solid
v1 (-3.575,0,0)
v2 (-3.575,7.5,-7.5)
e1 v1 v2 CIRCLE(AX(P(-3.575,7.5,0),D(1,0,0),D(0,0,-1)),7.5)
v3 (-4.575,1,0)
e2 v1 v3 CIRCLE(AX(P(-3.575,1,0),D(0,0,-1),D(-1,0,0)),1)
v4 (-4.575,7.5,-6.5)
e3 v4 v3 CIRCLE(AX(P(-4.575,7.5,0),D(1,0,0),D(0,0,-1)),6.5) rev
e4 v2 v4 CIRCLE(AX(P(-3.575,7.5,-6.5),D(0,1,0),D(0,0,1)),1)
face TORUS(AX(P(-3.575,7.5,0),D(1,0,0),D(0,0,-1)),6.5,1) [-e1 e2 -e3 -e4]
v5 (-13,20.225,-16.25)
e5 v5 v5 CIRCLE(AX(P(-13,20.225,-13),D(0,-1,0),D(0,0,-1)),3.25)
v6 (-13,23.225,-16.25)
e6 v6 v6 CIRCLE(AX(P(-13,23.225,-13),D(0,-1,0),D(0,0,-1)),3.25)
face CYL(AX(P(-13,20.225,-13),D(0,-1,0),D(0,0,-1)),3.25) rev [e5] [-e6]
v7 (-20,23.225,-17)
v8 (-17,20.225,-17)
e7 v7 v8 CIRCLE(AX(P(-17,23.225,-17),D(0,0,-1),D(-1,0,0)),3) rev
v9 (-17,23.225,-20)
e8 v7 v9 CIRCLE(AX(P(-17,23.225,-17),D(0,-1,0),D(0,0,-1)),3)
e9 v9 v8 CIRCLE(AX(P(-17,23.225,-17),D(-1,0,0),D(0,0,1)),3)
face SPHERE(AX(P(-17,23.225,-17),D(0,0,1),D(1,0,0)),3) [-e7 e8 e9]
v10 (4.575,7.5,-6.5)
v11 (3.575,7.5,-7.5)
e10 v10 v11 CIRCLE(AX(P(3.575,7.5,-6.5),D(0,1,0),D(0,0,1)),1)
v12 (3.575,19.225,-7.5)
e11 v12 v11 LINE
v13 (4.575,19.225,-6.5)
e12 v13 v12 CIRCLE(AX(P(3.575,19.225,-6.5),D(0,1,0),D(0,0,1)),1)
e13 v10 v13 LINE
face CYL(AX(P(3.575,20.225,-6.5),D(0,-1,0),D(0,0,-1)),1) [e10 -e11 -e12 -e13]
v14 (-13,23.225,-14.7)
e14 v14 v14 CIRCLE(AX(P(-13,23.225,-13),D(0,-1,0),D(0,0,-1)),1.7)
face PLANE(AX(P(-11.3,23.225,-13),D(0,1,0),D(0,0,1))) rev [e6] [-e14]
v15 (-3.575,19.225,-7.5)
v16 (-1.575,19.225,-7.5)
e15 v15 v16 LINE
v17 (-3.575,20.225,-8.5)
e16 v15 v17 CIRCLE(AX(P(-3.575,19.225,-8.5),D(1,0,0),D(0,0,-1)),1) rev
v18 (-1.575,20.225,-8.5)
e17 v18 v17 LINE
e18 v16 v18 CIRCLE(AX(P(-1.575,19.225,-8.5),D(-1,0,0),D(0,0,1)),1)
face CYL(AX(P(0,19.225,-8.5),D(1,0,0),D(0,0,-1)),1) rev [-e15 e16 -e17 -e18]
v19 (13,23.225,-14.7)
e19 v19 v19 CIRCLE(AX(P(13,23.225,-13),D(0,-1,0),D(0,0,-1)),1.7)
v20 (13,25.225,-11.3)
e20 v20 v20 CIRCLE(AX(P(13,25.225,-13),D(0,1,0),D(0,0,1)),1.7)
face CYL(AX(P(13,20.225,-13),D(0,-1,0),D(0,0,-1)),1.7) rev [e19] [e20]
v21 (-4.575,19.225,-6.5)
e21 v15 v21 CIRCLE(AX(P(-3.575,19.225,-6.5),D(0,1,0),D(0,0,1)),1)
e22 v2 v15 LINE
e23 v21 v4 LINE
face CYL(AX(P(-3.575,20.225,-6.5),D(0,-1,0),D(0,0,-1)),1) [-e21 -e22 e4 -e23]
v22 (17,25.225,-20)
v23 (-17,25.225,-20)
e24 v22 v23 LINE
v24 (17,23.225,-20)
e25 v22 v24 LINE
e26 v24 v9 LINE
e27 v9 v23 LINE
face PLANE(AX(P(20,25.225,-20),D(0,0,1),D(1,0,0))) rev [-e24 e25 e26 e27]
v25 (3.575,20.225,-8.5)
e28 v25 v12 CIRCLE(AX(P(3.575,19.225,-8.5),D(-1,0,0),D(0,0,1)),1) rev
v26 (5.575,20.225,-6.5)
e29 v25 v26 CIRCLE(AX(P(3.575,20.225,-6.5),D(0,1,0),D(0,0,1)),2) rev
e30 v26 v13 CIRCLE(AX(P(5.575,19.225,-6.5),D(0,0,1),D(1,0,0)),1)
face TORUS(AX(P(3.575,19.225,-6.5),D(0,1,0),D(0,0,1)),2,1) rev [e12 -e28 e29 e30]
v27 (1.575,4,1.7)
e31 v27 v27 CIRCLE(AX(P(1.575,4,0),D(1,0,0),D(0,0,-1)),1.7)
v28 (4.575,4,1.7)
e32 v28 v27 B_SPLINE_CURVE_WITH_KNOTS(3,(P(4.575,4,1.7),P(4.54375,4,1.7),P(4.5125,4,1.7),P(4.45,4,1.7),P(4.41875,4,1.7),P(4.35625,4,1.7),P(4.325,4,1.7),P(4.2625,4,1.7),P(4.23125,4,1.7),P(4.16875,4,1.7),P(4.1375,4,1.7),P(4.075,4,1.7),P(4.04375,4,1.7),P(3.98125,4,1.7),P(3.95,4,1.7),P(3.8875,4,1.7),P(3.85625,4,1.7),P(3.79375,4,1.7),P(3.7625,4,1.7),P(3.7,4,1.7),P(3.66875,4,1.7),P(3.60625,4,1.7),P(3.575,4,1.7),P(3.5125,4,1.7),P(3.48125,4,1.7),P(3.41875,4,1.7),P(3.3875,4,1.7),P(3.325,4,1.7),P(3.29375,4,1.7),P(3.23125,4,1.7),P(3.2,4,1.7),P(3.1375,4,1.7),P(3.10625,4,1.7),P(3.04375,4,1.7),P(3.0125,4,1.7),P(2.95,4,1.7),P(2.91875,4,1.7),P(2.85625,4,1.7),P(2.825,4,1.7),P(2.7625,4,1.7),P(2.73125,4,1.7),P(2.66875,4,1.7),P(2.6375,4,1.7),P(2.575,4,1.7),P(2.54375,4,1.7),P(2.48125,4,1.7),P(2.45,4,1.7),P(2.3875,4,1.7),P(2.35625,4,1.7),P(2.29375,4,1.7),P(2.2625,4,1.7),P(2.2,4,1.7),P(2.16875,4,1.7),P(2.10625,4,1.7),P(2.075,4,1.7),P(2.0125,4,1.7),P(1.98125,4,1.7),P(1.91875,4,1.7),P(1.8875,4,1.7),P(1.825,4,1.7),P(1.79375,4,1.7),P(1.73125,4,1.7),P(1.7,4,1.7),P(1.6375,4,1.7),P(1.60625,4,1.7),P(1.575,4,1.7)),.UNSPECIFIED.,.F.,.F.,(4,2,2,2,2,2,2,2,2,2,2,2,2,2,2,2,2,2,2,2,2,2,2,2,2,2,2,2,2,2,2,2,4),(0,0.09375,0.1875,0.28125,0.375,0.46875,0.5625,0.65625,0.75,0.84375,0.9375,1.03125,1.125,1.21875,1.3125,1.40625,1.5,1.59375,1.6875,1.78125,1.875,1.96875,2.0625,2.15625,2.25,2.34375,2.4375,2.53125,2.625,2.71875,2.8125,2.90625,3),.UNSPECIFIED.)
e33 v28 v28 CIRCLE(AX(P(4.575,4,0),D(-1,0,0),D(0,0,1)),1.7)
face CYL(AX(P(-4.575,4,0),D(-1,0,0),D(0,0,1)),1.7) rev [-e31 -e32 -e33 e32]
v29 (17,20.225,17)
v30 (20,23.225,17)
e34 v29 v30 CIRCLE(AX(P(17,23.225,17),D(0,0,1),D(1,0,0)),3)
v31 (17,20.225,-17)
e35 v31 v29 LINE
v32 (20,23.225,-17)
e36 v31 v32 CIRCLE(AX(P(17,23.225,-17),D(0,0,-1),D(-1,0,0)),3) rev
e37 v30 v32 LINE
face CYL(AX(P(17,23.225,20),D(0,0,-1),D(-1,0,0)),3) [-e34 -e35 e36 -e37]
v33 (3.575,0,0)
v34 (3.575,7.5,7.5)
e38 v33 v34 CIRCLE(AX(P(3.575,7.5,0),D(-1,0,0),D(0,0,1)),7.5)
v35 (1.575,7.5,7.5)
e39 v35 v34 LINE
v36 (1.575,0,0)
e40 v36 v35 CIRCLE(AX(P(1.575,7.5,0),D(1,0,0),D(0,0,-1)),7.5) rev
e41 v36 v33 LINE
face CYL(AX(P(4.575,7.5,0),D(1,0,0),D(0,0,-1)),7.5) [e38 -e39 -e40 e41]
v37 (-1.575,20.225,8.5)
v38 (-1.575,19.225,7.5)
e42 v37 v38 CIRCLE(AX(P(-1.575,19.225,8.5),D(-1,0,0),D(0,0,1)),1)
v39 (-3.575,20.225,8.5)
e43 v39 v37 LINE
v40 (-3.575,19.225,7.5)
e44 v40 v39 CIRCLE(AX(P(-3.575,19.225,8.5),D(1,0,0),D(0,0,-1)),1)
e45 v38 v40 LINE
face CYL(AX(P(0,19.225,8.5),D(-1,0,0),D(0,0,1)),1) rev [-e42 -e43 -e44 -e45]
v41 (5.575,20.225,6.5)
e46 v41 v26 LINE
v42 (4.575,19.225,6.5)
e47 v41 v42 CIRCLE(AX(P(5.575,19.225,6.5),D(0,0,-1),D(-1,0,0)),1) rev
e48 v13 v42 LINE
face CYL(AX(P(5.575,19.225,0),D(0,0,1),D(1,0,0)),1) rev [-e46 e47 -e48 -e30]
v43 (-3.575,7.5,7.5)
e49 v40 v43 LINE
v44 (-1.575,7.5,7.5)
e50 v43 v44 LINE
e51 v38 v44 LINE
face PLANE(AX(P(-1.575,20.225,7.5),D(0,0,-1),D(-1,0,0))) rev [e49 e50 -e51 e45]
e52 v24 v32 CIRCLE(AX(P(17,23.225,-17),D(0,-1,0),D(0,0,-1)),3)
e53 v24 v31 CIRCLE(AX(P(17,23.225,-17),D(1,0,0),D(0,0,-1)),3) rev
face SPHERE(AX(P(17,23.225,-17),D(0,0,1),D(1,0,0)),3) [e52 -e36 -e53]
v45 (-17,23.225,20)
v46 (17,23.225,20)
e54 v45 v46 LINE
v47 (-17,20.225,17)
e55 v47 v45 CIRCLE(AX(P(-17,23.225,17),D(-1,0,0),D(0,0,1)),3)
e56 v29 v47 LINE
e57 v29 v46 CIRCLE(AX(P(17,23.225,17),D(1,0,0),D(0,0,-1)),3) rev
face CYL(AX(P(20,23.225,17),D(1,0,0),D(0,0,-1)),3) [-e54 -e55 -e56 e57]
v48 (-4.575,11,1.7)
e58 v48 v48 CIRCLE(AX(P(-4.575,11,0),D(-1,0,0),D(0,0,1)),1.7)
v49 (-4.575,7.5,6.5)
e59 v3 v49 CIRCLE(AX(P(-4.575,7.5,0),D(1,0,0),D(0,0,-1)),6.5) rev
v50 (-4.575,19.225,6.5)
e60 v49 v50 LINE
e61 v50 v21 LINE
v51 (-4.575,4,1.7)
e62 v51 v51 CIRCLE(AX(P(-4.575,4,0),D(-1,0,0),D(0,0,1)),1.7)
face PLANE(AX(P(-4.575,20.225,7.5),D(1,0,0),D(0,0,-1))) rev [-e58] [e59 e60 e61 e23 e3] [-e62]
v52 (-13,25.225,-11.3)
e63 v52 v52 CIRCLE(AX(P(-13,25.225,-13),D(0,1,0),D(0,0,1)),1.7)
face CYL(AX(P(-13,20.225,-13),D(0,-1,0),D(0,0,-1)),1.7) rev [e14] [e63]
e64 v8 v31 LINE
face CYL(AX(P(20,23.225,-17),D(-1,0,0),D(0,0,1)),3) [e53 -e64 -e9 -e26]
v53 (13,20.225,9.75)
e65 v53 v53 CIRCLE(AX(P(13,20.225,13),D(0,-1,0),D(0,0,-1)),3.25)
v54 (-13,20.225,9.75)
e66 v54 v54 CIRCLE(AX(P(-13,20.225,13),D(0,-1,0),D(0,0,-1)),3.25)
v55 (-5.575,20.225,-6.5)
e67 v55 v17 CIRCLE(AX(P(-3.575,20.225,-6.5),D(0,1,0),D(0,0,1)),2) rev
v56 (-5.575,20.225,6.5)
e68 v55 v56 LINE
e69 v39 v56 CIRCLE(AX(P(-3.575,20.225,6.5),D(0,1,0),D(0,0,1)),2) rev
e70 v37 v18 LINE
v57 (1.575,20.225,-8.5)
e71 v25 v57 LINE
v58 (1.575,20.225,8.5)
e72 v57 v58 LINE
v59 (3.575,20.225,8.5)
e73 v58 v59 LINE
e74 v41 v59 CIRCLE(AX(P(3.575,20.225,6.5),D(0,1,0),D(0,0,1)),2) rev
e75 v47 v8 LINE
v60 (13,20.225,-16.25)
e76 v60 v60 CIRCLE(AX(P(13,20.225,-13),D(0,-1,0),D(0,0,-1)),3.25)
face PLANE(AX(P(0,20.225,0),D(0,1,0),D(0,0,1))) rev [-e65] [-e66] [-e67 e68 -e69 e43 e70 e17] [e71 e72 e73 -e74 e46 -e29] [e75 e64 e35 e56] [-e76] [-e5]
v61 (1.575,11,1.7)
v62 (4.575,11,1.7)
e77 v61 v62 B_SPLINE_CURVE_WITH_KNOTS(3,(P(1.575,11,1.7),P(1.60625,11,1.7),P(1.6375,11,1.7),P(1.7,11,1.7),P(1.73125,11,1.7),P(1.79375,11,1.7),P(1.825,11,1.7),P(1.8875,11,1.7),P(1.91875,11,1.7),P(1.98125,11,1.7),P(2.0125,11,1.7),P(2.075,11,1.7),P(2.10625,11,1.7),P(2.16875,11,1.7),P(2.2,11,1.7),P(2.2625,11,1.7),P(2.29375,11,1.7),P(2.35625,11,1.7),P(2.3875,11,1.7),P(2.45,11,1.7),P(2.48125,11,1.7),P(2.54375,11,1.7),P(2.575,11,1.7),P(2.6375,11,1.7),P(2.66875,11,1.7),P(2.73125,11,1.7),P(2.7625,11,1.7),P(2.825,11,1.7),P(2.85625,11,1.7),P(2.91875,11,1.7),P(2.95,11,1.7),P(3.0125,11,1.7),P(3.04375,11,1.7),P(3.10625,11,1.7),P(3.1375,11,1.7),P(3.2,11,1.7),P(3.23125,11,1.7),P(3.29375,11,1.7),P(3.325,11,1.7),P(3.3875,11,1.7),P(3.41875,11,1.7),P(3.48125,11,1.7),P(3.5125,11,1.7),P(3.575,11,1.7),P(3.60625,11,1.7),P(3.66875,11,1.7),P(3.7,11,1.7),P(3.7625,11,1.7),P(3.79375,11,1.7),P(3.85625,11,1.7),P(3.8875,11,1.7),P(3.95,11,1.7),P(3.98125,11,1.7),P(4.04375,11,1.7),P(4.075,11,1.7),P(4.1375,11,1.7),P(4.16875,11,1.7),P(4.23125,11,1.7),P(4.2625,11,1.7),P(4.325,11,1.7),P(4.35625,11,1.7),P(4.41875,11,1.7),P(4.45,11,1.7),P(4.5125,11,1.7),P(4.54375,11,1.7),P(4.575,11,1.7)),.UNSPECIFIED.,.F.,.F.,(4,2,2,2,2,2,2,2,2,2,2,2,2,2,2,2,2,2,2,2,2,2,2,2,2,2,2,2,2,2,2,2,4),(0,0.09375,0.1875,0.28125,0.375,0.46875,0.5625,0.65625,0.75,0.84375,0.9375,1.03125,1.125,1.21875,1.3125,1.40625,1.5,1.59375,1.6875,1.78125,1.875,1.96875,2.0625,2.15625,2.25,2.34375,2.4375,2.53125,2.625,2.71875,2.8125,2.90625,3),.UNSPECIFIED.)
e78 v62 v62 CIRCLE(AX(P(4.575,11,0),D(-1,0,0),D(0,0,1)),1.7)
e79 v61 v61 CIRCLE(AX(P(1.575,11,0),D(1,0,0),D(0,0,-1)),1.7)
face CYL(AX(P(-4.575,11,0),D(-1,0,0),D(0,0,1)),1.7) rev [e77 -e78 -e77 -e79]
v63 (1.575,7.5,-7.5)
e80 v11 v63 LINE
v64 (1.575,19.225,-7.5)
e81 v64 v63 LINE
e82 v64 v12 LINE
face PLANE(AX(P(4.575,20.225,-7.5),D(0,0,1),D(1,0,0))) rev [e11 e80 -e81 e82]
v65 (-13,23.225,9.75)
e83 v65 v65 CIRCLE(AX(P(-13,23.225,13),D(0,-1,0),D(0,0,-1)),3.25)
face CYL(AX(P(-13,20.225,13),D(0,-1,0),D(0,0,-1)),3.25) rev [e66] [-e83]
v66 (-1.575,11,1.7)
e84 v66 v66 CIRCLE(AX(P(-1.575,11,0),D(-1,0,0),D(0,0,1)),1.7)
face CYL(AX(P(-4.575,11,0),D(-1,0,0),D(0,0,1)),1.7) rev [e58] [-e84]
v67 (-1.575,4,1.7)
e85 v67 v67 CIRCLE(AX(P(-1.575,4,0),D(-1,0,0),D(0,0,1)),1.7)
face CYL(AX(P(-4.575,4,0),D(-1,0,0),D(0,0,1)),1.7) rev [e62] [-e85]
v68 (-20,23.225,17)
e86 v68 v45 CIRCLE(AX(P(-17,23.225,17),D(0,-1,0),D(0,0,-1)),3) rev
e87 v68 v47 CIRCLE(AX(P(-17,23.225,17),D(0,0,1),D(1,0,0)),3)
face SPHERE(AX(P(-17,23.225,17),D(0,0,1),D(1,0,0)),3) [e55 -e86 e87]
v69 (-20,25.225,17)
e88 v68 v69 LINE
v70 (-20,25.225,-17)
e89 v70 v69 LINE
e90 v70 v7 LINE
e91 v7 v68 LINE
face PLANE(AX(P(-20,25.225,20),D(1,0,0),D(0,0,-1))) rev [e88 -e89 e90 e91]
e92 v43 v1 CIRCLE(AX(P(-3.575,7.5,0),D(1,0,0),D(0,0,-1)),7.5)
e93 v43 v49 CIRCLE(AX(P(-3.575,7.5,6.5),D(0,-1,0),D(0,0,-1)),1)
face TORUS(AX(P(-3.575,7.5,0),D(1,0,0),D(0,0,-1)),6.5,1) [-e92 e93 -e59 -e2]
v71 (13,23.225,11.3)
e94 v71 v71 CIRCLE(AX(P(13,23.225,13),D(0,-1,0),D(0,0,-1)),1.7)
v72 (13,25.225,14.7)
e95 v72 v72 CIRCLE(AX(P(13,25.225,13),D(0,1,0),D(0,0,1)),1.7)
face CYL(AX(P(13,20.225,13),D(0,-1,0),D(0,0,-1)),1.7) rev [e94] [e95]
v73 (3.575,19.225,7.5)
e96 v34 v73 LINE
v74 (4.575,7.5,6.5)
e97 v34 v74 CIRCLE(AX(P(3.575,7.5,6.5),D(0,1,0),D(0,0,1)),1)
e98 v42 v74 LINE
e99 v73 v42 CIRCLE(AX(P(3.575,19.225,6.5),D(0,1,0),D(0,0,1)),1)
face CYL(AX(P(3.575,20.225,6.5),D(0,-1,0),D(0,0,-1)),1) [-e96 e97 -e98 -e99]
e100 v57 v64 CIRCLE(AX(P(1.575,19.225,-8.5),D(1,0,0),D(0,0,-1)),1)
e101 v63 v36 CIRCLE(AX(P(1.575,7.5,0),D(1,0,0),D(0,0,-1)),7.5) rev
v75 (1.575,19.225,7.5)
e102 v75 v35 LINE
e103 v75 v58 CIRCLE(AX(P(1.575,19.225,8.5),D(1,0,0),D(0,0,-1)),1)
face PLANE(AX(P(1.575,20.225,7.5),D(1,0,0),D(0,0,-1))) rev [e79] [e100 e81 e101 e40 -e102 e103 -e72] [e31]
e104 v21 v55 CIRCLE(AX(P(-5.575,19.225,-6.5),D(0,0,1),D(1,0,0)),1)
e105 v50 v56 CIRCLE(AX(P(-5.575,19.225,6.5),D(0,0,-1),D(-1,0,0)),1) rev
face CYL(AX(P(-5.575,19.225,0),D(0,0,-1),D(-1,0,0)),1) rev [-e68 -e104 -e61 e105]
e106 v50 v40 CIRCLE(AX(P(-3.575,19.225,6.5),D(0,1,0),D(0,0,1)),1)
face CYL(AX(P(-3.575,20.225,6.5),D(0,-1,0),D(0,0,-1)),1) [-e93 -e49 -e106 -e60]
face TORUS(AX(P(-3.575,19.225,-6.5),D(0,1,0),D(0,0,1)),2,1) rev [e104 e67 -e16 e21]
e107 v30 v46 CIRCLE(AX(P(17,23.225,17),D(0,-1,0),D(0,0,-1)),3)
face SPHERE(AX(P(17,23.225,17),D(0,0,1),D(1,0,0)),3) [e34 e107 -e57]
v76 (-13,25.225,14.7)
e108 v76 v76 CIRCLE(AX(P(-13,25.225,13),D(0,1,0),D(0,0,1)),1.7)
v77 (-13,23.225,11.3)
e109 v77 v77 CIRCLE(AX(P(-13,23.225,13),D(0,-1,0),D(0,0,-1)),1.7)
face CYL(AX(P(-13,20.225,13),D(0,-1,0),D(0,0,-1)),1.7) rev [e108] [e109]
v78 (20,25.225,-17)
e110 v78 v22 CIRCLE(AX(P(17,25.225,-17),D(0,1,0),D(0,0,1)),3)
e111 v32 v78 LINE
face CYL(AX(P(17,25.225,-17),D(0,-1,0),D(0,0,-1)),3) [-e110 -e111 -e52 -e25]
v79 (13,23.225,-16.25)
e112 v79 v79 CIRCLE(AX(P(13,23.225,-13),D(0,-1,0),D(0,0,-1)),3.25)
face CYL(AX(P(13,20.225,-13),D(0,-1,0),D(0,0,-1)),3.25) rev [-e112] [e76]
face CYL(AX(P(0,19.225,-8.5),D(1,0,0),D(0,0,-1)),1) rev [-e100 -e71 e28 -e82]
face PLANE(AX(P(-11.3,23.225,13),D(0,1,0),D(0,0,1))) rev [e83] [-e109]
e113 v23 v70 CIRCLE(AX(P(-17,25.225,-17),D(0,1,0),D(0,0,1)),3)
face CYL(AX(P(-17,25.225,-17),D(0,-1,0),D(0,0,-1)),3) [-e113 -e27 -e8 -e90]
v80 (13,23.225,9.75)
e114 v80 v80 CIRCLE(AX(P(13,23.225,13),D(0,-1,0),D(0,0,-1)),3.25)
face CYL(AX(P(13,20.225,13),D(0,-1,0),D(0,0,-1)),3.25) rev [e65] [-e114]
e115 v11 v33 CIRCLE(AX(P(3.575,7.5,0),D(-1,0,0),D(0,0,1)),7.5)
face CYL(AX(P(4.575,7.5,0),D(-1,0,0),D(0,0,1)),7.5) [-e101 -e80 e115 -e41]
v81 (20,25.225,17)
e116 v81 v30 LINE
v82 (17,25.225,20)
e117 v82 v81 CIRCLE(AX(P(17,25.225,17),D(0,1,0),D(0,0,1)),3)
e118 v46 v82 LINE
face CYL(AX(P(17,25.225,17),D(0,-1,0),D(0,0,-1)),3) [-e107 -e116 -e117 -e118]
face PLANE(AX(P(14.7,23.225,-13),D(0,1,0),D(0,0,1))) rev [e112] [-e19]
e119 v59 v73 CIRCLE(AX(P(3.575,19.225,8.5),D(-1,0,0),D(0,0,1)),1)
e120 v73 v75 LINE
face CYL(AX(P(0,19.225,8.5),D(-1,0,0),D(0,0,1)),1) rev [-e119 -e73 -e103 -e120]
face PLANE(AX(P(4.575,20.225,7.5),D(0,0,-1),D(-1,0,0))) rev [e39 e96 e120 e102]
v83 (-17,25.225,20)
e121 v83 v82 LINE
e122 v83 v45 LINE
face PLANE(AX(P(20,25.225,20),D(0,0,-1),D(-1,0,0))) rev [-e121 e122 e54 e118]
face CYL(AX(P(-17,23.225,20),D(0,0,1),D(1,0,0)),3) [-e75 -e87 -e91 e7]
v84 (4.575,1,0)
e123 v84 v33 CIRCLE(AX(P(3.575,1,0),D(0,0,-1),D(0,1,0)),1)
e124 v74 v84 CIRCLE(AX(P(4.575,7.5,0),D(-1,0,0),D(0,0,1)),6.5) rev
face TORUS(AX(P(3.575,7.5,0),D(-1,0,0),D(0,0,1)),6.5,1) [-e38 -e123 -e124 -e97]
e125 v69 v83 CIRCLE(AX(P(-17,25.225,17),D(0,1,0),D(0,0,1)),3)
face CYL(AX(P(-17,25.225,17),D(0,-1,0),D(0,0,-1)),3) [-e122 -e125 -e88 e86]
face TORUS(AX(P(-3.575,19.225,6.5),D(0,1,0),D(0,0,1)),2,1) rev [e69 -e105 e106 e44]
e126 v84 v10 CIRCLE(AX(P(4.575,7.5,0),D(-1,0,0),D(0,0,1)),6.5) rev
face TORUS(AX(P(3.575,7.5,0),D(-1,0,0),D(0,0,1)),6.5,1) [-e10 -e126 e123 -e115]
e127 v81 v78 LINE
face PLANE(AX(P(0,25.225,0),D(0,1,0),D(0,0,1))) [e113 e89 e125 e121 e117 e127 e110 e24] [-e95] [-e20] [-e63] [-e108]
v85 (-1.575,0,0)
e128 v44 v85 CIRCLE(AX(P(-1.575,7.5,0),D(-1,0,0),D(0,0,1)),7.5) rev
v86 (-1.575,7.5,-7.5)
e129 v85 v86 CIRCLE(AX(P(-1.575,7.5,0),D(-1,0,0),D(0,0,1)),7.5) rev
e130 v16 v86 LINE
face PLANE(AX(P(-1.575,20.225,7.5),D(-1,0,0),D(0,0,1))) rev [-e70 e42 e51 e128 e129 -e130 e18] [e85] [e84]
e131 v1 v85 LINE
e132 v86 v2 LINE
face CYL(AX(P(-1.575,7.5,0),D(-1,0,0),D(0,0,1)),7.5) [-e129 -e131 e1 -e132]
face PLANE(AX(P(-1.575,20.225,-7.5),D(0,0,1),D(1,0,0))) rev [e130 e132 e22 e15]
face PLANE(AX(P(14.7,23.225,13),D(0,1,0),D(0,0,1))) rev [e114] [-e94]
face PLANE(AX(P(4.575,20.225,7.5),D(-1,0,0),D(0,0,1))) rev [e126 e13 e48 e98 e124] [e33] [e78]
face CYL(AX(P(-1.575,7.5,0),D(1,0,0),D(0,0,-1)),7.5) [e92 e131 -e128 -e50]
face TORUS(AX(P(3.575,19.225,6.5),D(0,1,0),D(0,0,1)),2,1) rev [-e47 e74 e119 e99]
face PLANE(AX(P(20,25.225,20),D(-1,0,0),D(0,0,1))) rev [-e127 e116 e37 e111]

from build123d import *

# Parameters (mm, degrees)
SKETCH1_W                      = 3
SKETCH1_H                      = 15
BOSS_EXTRUDE1_DEPTH            = 20.225
BOSS_EXTRUDE1_2_DEPTH          = 20.225
SKETCH2_W                      = 40
SKETCH2_H                      = 40
BOSS_EXTRUDE2_DEPTH            = 5
M3_CLEARANCE_HOLE1_D           = 3.4
FILLET1_R                      = 7.5
FILLET3_R                      = 1
CBORE_FOR_M3_SHCS1_D           = 3.4
CBORE_FOR_M3_SHCS1_CBORE_D     = 6.5
CBORE_FOR_M3_SHCS1_CBORE_DEPTH = 3
FILLET5_R                      = 3


with BuildPart() as part:
    # Sketch1 → Boss-Extrude1 (new body)
    with BuildSketch(Plane(origin=(0, 0, 0), x_dir=(1, 0, 0), z_dir=(0, 1, 0))):
        with Locations((-3.075, 0)):
            Rectangle(SKETCH1_W, SKETCH1_H)
    extrude(amount=BOSS_EXTRUDE1_DEPTH)



with BuildPart() as body_2:
    # Sketch1 → Boss-Extrude1 2 (new body)
    with BuildSketch(Plane(origin=(0, 0, 0), x_dir=(1, 0, 0), z_dir=(0, 1, 0))):
        with Locations((3.075, 0)):
            Rectangle(SKETCH1_W, SKETCH1_H)
    extrude(amount=BOSS_EXTRUDE1_2_DEPTH)


with BuildPart() as part_1:
    add(part.part)

    add(body_2.part)  # Boss-Extrude2 merges body 2
    # Sketch2 → Boss-Extrude2 (add)
    with BuildSketch(Plane(origin=(0, 20.225, 0), x_dir=(1, 0, 0), z_dir=(0, 1, 0))):
        Rectangle(SKETCH2_W, SKETCH2_H)
    extrude(amount=BOSS_EXTRUDE2_DEPTH)

    # M3 Clearance Hole1 (through all)
    with Locations(Plane.ZY.offset(4.575)):
        with Locations((0, 11), (0, 4)):
            Hole(M3_CLEARANCE_HOLE1_D / 2)

    # Fillet1
    fillet1_edges = [part_1.edges().sort_by_distance(p)[0] for p in [
        (3.075, 0, 7.5),
        (-3.075, 0, 7.5),
        (-3.075, 0, -7.5),
        (3.075, 0, -7.5),
    ]]
    fillet(fillet1_edges, radius=FILLET1_R - 0.0001)  # a hair under: the kernel refuses the full size

    # Fillet3
    fillet3_edges = [part_1.edges().sort_by_distance(p)[0] for p in [
        (-3.075, 20.225, -7.5),
        (4.575, 13.86245, 7.5),
        (4.575, 13.86245, -7.5),
        (3.075, 20.225, 7.5),
        (4.575, 20.225, 0),
        (3.075, 20.225, -7.5),
        (-4.575, 20.225, 0),
        (4.575, 2.196669852, -5.303330148),
        (4.575, 2.196669852, 5.303330148),
        (-4.575, 2.196669852, -5.303330148),
        (-4.575, 2.196669852, 5.303330148),
        (-4.575, 13.86245, -7.5),
        (-4.575, 13.86245, 7.5),
        (-3.075, 20.225, 7.5),
    ]]
    fillet(fillet3_edges, radius=FILLET3_R)

    # CBORE for M3 SHCS1 (through all)
    with Locations(Plane(origin=(0, 20.225, 0), x_dir=(-1, 0, 0), z_dir=(0, -1, 0))):
        with Locations((-13, -13), (-13, 13), (13, 13), (13, -13)):
            CounterBoreHole(CBORE_FOR_M3_SHCS1_D / 2, CBORE_FOR_M3_SHCS1_CBORE_D / 2, CBORE_FOR_M3_SHCS1_CBORE_DEPTH)

    # Fillet5
    fillet5_edges = [part_1.edges().sort_by_distance(p)[0] for p in [
        (-20, 20.225, 0),
        (-20, 22.725, -20),
        (0, 20.225, 20),
        (-20, 22.725, 20),
        (20, 20.225, 0),
        (20, 22.725, 20),
        (0, 20.225, -20),
        (20, 22.725, -20),
    ]]
    fillet(fillet5_edges, radius=FILLET5_R)


solid = part_1.part
